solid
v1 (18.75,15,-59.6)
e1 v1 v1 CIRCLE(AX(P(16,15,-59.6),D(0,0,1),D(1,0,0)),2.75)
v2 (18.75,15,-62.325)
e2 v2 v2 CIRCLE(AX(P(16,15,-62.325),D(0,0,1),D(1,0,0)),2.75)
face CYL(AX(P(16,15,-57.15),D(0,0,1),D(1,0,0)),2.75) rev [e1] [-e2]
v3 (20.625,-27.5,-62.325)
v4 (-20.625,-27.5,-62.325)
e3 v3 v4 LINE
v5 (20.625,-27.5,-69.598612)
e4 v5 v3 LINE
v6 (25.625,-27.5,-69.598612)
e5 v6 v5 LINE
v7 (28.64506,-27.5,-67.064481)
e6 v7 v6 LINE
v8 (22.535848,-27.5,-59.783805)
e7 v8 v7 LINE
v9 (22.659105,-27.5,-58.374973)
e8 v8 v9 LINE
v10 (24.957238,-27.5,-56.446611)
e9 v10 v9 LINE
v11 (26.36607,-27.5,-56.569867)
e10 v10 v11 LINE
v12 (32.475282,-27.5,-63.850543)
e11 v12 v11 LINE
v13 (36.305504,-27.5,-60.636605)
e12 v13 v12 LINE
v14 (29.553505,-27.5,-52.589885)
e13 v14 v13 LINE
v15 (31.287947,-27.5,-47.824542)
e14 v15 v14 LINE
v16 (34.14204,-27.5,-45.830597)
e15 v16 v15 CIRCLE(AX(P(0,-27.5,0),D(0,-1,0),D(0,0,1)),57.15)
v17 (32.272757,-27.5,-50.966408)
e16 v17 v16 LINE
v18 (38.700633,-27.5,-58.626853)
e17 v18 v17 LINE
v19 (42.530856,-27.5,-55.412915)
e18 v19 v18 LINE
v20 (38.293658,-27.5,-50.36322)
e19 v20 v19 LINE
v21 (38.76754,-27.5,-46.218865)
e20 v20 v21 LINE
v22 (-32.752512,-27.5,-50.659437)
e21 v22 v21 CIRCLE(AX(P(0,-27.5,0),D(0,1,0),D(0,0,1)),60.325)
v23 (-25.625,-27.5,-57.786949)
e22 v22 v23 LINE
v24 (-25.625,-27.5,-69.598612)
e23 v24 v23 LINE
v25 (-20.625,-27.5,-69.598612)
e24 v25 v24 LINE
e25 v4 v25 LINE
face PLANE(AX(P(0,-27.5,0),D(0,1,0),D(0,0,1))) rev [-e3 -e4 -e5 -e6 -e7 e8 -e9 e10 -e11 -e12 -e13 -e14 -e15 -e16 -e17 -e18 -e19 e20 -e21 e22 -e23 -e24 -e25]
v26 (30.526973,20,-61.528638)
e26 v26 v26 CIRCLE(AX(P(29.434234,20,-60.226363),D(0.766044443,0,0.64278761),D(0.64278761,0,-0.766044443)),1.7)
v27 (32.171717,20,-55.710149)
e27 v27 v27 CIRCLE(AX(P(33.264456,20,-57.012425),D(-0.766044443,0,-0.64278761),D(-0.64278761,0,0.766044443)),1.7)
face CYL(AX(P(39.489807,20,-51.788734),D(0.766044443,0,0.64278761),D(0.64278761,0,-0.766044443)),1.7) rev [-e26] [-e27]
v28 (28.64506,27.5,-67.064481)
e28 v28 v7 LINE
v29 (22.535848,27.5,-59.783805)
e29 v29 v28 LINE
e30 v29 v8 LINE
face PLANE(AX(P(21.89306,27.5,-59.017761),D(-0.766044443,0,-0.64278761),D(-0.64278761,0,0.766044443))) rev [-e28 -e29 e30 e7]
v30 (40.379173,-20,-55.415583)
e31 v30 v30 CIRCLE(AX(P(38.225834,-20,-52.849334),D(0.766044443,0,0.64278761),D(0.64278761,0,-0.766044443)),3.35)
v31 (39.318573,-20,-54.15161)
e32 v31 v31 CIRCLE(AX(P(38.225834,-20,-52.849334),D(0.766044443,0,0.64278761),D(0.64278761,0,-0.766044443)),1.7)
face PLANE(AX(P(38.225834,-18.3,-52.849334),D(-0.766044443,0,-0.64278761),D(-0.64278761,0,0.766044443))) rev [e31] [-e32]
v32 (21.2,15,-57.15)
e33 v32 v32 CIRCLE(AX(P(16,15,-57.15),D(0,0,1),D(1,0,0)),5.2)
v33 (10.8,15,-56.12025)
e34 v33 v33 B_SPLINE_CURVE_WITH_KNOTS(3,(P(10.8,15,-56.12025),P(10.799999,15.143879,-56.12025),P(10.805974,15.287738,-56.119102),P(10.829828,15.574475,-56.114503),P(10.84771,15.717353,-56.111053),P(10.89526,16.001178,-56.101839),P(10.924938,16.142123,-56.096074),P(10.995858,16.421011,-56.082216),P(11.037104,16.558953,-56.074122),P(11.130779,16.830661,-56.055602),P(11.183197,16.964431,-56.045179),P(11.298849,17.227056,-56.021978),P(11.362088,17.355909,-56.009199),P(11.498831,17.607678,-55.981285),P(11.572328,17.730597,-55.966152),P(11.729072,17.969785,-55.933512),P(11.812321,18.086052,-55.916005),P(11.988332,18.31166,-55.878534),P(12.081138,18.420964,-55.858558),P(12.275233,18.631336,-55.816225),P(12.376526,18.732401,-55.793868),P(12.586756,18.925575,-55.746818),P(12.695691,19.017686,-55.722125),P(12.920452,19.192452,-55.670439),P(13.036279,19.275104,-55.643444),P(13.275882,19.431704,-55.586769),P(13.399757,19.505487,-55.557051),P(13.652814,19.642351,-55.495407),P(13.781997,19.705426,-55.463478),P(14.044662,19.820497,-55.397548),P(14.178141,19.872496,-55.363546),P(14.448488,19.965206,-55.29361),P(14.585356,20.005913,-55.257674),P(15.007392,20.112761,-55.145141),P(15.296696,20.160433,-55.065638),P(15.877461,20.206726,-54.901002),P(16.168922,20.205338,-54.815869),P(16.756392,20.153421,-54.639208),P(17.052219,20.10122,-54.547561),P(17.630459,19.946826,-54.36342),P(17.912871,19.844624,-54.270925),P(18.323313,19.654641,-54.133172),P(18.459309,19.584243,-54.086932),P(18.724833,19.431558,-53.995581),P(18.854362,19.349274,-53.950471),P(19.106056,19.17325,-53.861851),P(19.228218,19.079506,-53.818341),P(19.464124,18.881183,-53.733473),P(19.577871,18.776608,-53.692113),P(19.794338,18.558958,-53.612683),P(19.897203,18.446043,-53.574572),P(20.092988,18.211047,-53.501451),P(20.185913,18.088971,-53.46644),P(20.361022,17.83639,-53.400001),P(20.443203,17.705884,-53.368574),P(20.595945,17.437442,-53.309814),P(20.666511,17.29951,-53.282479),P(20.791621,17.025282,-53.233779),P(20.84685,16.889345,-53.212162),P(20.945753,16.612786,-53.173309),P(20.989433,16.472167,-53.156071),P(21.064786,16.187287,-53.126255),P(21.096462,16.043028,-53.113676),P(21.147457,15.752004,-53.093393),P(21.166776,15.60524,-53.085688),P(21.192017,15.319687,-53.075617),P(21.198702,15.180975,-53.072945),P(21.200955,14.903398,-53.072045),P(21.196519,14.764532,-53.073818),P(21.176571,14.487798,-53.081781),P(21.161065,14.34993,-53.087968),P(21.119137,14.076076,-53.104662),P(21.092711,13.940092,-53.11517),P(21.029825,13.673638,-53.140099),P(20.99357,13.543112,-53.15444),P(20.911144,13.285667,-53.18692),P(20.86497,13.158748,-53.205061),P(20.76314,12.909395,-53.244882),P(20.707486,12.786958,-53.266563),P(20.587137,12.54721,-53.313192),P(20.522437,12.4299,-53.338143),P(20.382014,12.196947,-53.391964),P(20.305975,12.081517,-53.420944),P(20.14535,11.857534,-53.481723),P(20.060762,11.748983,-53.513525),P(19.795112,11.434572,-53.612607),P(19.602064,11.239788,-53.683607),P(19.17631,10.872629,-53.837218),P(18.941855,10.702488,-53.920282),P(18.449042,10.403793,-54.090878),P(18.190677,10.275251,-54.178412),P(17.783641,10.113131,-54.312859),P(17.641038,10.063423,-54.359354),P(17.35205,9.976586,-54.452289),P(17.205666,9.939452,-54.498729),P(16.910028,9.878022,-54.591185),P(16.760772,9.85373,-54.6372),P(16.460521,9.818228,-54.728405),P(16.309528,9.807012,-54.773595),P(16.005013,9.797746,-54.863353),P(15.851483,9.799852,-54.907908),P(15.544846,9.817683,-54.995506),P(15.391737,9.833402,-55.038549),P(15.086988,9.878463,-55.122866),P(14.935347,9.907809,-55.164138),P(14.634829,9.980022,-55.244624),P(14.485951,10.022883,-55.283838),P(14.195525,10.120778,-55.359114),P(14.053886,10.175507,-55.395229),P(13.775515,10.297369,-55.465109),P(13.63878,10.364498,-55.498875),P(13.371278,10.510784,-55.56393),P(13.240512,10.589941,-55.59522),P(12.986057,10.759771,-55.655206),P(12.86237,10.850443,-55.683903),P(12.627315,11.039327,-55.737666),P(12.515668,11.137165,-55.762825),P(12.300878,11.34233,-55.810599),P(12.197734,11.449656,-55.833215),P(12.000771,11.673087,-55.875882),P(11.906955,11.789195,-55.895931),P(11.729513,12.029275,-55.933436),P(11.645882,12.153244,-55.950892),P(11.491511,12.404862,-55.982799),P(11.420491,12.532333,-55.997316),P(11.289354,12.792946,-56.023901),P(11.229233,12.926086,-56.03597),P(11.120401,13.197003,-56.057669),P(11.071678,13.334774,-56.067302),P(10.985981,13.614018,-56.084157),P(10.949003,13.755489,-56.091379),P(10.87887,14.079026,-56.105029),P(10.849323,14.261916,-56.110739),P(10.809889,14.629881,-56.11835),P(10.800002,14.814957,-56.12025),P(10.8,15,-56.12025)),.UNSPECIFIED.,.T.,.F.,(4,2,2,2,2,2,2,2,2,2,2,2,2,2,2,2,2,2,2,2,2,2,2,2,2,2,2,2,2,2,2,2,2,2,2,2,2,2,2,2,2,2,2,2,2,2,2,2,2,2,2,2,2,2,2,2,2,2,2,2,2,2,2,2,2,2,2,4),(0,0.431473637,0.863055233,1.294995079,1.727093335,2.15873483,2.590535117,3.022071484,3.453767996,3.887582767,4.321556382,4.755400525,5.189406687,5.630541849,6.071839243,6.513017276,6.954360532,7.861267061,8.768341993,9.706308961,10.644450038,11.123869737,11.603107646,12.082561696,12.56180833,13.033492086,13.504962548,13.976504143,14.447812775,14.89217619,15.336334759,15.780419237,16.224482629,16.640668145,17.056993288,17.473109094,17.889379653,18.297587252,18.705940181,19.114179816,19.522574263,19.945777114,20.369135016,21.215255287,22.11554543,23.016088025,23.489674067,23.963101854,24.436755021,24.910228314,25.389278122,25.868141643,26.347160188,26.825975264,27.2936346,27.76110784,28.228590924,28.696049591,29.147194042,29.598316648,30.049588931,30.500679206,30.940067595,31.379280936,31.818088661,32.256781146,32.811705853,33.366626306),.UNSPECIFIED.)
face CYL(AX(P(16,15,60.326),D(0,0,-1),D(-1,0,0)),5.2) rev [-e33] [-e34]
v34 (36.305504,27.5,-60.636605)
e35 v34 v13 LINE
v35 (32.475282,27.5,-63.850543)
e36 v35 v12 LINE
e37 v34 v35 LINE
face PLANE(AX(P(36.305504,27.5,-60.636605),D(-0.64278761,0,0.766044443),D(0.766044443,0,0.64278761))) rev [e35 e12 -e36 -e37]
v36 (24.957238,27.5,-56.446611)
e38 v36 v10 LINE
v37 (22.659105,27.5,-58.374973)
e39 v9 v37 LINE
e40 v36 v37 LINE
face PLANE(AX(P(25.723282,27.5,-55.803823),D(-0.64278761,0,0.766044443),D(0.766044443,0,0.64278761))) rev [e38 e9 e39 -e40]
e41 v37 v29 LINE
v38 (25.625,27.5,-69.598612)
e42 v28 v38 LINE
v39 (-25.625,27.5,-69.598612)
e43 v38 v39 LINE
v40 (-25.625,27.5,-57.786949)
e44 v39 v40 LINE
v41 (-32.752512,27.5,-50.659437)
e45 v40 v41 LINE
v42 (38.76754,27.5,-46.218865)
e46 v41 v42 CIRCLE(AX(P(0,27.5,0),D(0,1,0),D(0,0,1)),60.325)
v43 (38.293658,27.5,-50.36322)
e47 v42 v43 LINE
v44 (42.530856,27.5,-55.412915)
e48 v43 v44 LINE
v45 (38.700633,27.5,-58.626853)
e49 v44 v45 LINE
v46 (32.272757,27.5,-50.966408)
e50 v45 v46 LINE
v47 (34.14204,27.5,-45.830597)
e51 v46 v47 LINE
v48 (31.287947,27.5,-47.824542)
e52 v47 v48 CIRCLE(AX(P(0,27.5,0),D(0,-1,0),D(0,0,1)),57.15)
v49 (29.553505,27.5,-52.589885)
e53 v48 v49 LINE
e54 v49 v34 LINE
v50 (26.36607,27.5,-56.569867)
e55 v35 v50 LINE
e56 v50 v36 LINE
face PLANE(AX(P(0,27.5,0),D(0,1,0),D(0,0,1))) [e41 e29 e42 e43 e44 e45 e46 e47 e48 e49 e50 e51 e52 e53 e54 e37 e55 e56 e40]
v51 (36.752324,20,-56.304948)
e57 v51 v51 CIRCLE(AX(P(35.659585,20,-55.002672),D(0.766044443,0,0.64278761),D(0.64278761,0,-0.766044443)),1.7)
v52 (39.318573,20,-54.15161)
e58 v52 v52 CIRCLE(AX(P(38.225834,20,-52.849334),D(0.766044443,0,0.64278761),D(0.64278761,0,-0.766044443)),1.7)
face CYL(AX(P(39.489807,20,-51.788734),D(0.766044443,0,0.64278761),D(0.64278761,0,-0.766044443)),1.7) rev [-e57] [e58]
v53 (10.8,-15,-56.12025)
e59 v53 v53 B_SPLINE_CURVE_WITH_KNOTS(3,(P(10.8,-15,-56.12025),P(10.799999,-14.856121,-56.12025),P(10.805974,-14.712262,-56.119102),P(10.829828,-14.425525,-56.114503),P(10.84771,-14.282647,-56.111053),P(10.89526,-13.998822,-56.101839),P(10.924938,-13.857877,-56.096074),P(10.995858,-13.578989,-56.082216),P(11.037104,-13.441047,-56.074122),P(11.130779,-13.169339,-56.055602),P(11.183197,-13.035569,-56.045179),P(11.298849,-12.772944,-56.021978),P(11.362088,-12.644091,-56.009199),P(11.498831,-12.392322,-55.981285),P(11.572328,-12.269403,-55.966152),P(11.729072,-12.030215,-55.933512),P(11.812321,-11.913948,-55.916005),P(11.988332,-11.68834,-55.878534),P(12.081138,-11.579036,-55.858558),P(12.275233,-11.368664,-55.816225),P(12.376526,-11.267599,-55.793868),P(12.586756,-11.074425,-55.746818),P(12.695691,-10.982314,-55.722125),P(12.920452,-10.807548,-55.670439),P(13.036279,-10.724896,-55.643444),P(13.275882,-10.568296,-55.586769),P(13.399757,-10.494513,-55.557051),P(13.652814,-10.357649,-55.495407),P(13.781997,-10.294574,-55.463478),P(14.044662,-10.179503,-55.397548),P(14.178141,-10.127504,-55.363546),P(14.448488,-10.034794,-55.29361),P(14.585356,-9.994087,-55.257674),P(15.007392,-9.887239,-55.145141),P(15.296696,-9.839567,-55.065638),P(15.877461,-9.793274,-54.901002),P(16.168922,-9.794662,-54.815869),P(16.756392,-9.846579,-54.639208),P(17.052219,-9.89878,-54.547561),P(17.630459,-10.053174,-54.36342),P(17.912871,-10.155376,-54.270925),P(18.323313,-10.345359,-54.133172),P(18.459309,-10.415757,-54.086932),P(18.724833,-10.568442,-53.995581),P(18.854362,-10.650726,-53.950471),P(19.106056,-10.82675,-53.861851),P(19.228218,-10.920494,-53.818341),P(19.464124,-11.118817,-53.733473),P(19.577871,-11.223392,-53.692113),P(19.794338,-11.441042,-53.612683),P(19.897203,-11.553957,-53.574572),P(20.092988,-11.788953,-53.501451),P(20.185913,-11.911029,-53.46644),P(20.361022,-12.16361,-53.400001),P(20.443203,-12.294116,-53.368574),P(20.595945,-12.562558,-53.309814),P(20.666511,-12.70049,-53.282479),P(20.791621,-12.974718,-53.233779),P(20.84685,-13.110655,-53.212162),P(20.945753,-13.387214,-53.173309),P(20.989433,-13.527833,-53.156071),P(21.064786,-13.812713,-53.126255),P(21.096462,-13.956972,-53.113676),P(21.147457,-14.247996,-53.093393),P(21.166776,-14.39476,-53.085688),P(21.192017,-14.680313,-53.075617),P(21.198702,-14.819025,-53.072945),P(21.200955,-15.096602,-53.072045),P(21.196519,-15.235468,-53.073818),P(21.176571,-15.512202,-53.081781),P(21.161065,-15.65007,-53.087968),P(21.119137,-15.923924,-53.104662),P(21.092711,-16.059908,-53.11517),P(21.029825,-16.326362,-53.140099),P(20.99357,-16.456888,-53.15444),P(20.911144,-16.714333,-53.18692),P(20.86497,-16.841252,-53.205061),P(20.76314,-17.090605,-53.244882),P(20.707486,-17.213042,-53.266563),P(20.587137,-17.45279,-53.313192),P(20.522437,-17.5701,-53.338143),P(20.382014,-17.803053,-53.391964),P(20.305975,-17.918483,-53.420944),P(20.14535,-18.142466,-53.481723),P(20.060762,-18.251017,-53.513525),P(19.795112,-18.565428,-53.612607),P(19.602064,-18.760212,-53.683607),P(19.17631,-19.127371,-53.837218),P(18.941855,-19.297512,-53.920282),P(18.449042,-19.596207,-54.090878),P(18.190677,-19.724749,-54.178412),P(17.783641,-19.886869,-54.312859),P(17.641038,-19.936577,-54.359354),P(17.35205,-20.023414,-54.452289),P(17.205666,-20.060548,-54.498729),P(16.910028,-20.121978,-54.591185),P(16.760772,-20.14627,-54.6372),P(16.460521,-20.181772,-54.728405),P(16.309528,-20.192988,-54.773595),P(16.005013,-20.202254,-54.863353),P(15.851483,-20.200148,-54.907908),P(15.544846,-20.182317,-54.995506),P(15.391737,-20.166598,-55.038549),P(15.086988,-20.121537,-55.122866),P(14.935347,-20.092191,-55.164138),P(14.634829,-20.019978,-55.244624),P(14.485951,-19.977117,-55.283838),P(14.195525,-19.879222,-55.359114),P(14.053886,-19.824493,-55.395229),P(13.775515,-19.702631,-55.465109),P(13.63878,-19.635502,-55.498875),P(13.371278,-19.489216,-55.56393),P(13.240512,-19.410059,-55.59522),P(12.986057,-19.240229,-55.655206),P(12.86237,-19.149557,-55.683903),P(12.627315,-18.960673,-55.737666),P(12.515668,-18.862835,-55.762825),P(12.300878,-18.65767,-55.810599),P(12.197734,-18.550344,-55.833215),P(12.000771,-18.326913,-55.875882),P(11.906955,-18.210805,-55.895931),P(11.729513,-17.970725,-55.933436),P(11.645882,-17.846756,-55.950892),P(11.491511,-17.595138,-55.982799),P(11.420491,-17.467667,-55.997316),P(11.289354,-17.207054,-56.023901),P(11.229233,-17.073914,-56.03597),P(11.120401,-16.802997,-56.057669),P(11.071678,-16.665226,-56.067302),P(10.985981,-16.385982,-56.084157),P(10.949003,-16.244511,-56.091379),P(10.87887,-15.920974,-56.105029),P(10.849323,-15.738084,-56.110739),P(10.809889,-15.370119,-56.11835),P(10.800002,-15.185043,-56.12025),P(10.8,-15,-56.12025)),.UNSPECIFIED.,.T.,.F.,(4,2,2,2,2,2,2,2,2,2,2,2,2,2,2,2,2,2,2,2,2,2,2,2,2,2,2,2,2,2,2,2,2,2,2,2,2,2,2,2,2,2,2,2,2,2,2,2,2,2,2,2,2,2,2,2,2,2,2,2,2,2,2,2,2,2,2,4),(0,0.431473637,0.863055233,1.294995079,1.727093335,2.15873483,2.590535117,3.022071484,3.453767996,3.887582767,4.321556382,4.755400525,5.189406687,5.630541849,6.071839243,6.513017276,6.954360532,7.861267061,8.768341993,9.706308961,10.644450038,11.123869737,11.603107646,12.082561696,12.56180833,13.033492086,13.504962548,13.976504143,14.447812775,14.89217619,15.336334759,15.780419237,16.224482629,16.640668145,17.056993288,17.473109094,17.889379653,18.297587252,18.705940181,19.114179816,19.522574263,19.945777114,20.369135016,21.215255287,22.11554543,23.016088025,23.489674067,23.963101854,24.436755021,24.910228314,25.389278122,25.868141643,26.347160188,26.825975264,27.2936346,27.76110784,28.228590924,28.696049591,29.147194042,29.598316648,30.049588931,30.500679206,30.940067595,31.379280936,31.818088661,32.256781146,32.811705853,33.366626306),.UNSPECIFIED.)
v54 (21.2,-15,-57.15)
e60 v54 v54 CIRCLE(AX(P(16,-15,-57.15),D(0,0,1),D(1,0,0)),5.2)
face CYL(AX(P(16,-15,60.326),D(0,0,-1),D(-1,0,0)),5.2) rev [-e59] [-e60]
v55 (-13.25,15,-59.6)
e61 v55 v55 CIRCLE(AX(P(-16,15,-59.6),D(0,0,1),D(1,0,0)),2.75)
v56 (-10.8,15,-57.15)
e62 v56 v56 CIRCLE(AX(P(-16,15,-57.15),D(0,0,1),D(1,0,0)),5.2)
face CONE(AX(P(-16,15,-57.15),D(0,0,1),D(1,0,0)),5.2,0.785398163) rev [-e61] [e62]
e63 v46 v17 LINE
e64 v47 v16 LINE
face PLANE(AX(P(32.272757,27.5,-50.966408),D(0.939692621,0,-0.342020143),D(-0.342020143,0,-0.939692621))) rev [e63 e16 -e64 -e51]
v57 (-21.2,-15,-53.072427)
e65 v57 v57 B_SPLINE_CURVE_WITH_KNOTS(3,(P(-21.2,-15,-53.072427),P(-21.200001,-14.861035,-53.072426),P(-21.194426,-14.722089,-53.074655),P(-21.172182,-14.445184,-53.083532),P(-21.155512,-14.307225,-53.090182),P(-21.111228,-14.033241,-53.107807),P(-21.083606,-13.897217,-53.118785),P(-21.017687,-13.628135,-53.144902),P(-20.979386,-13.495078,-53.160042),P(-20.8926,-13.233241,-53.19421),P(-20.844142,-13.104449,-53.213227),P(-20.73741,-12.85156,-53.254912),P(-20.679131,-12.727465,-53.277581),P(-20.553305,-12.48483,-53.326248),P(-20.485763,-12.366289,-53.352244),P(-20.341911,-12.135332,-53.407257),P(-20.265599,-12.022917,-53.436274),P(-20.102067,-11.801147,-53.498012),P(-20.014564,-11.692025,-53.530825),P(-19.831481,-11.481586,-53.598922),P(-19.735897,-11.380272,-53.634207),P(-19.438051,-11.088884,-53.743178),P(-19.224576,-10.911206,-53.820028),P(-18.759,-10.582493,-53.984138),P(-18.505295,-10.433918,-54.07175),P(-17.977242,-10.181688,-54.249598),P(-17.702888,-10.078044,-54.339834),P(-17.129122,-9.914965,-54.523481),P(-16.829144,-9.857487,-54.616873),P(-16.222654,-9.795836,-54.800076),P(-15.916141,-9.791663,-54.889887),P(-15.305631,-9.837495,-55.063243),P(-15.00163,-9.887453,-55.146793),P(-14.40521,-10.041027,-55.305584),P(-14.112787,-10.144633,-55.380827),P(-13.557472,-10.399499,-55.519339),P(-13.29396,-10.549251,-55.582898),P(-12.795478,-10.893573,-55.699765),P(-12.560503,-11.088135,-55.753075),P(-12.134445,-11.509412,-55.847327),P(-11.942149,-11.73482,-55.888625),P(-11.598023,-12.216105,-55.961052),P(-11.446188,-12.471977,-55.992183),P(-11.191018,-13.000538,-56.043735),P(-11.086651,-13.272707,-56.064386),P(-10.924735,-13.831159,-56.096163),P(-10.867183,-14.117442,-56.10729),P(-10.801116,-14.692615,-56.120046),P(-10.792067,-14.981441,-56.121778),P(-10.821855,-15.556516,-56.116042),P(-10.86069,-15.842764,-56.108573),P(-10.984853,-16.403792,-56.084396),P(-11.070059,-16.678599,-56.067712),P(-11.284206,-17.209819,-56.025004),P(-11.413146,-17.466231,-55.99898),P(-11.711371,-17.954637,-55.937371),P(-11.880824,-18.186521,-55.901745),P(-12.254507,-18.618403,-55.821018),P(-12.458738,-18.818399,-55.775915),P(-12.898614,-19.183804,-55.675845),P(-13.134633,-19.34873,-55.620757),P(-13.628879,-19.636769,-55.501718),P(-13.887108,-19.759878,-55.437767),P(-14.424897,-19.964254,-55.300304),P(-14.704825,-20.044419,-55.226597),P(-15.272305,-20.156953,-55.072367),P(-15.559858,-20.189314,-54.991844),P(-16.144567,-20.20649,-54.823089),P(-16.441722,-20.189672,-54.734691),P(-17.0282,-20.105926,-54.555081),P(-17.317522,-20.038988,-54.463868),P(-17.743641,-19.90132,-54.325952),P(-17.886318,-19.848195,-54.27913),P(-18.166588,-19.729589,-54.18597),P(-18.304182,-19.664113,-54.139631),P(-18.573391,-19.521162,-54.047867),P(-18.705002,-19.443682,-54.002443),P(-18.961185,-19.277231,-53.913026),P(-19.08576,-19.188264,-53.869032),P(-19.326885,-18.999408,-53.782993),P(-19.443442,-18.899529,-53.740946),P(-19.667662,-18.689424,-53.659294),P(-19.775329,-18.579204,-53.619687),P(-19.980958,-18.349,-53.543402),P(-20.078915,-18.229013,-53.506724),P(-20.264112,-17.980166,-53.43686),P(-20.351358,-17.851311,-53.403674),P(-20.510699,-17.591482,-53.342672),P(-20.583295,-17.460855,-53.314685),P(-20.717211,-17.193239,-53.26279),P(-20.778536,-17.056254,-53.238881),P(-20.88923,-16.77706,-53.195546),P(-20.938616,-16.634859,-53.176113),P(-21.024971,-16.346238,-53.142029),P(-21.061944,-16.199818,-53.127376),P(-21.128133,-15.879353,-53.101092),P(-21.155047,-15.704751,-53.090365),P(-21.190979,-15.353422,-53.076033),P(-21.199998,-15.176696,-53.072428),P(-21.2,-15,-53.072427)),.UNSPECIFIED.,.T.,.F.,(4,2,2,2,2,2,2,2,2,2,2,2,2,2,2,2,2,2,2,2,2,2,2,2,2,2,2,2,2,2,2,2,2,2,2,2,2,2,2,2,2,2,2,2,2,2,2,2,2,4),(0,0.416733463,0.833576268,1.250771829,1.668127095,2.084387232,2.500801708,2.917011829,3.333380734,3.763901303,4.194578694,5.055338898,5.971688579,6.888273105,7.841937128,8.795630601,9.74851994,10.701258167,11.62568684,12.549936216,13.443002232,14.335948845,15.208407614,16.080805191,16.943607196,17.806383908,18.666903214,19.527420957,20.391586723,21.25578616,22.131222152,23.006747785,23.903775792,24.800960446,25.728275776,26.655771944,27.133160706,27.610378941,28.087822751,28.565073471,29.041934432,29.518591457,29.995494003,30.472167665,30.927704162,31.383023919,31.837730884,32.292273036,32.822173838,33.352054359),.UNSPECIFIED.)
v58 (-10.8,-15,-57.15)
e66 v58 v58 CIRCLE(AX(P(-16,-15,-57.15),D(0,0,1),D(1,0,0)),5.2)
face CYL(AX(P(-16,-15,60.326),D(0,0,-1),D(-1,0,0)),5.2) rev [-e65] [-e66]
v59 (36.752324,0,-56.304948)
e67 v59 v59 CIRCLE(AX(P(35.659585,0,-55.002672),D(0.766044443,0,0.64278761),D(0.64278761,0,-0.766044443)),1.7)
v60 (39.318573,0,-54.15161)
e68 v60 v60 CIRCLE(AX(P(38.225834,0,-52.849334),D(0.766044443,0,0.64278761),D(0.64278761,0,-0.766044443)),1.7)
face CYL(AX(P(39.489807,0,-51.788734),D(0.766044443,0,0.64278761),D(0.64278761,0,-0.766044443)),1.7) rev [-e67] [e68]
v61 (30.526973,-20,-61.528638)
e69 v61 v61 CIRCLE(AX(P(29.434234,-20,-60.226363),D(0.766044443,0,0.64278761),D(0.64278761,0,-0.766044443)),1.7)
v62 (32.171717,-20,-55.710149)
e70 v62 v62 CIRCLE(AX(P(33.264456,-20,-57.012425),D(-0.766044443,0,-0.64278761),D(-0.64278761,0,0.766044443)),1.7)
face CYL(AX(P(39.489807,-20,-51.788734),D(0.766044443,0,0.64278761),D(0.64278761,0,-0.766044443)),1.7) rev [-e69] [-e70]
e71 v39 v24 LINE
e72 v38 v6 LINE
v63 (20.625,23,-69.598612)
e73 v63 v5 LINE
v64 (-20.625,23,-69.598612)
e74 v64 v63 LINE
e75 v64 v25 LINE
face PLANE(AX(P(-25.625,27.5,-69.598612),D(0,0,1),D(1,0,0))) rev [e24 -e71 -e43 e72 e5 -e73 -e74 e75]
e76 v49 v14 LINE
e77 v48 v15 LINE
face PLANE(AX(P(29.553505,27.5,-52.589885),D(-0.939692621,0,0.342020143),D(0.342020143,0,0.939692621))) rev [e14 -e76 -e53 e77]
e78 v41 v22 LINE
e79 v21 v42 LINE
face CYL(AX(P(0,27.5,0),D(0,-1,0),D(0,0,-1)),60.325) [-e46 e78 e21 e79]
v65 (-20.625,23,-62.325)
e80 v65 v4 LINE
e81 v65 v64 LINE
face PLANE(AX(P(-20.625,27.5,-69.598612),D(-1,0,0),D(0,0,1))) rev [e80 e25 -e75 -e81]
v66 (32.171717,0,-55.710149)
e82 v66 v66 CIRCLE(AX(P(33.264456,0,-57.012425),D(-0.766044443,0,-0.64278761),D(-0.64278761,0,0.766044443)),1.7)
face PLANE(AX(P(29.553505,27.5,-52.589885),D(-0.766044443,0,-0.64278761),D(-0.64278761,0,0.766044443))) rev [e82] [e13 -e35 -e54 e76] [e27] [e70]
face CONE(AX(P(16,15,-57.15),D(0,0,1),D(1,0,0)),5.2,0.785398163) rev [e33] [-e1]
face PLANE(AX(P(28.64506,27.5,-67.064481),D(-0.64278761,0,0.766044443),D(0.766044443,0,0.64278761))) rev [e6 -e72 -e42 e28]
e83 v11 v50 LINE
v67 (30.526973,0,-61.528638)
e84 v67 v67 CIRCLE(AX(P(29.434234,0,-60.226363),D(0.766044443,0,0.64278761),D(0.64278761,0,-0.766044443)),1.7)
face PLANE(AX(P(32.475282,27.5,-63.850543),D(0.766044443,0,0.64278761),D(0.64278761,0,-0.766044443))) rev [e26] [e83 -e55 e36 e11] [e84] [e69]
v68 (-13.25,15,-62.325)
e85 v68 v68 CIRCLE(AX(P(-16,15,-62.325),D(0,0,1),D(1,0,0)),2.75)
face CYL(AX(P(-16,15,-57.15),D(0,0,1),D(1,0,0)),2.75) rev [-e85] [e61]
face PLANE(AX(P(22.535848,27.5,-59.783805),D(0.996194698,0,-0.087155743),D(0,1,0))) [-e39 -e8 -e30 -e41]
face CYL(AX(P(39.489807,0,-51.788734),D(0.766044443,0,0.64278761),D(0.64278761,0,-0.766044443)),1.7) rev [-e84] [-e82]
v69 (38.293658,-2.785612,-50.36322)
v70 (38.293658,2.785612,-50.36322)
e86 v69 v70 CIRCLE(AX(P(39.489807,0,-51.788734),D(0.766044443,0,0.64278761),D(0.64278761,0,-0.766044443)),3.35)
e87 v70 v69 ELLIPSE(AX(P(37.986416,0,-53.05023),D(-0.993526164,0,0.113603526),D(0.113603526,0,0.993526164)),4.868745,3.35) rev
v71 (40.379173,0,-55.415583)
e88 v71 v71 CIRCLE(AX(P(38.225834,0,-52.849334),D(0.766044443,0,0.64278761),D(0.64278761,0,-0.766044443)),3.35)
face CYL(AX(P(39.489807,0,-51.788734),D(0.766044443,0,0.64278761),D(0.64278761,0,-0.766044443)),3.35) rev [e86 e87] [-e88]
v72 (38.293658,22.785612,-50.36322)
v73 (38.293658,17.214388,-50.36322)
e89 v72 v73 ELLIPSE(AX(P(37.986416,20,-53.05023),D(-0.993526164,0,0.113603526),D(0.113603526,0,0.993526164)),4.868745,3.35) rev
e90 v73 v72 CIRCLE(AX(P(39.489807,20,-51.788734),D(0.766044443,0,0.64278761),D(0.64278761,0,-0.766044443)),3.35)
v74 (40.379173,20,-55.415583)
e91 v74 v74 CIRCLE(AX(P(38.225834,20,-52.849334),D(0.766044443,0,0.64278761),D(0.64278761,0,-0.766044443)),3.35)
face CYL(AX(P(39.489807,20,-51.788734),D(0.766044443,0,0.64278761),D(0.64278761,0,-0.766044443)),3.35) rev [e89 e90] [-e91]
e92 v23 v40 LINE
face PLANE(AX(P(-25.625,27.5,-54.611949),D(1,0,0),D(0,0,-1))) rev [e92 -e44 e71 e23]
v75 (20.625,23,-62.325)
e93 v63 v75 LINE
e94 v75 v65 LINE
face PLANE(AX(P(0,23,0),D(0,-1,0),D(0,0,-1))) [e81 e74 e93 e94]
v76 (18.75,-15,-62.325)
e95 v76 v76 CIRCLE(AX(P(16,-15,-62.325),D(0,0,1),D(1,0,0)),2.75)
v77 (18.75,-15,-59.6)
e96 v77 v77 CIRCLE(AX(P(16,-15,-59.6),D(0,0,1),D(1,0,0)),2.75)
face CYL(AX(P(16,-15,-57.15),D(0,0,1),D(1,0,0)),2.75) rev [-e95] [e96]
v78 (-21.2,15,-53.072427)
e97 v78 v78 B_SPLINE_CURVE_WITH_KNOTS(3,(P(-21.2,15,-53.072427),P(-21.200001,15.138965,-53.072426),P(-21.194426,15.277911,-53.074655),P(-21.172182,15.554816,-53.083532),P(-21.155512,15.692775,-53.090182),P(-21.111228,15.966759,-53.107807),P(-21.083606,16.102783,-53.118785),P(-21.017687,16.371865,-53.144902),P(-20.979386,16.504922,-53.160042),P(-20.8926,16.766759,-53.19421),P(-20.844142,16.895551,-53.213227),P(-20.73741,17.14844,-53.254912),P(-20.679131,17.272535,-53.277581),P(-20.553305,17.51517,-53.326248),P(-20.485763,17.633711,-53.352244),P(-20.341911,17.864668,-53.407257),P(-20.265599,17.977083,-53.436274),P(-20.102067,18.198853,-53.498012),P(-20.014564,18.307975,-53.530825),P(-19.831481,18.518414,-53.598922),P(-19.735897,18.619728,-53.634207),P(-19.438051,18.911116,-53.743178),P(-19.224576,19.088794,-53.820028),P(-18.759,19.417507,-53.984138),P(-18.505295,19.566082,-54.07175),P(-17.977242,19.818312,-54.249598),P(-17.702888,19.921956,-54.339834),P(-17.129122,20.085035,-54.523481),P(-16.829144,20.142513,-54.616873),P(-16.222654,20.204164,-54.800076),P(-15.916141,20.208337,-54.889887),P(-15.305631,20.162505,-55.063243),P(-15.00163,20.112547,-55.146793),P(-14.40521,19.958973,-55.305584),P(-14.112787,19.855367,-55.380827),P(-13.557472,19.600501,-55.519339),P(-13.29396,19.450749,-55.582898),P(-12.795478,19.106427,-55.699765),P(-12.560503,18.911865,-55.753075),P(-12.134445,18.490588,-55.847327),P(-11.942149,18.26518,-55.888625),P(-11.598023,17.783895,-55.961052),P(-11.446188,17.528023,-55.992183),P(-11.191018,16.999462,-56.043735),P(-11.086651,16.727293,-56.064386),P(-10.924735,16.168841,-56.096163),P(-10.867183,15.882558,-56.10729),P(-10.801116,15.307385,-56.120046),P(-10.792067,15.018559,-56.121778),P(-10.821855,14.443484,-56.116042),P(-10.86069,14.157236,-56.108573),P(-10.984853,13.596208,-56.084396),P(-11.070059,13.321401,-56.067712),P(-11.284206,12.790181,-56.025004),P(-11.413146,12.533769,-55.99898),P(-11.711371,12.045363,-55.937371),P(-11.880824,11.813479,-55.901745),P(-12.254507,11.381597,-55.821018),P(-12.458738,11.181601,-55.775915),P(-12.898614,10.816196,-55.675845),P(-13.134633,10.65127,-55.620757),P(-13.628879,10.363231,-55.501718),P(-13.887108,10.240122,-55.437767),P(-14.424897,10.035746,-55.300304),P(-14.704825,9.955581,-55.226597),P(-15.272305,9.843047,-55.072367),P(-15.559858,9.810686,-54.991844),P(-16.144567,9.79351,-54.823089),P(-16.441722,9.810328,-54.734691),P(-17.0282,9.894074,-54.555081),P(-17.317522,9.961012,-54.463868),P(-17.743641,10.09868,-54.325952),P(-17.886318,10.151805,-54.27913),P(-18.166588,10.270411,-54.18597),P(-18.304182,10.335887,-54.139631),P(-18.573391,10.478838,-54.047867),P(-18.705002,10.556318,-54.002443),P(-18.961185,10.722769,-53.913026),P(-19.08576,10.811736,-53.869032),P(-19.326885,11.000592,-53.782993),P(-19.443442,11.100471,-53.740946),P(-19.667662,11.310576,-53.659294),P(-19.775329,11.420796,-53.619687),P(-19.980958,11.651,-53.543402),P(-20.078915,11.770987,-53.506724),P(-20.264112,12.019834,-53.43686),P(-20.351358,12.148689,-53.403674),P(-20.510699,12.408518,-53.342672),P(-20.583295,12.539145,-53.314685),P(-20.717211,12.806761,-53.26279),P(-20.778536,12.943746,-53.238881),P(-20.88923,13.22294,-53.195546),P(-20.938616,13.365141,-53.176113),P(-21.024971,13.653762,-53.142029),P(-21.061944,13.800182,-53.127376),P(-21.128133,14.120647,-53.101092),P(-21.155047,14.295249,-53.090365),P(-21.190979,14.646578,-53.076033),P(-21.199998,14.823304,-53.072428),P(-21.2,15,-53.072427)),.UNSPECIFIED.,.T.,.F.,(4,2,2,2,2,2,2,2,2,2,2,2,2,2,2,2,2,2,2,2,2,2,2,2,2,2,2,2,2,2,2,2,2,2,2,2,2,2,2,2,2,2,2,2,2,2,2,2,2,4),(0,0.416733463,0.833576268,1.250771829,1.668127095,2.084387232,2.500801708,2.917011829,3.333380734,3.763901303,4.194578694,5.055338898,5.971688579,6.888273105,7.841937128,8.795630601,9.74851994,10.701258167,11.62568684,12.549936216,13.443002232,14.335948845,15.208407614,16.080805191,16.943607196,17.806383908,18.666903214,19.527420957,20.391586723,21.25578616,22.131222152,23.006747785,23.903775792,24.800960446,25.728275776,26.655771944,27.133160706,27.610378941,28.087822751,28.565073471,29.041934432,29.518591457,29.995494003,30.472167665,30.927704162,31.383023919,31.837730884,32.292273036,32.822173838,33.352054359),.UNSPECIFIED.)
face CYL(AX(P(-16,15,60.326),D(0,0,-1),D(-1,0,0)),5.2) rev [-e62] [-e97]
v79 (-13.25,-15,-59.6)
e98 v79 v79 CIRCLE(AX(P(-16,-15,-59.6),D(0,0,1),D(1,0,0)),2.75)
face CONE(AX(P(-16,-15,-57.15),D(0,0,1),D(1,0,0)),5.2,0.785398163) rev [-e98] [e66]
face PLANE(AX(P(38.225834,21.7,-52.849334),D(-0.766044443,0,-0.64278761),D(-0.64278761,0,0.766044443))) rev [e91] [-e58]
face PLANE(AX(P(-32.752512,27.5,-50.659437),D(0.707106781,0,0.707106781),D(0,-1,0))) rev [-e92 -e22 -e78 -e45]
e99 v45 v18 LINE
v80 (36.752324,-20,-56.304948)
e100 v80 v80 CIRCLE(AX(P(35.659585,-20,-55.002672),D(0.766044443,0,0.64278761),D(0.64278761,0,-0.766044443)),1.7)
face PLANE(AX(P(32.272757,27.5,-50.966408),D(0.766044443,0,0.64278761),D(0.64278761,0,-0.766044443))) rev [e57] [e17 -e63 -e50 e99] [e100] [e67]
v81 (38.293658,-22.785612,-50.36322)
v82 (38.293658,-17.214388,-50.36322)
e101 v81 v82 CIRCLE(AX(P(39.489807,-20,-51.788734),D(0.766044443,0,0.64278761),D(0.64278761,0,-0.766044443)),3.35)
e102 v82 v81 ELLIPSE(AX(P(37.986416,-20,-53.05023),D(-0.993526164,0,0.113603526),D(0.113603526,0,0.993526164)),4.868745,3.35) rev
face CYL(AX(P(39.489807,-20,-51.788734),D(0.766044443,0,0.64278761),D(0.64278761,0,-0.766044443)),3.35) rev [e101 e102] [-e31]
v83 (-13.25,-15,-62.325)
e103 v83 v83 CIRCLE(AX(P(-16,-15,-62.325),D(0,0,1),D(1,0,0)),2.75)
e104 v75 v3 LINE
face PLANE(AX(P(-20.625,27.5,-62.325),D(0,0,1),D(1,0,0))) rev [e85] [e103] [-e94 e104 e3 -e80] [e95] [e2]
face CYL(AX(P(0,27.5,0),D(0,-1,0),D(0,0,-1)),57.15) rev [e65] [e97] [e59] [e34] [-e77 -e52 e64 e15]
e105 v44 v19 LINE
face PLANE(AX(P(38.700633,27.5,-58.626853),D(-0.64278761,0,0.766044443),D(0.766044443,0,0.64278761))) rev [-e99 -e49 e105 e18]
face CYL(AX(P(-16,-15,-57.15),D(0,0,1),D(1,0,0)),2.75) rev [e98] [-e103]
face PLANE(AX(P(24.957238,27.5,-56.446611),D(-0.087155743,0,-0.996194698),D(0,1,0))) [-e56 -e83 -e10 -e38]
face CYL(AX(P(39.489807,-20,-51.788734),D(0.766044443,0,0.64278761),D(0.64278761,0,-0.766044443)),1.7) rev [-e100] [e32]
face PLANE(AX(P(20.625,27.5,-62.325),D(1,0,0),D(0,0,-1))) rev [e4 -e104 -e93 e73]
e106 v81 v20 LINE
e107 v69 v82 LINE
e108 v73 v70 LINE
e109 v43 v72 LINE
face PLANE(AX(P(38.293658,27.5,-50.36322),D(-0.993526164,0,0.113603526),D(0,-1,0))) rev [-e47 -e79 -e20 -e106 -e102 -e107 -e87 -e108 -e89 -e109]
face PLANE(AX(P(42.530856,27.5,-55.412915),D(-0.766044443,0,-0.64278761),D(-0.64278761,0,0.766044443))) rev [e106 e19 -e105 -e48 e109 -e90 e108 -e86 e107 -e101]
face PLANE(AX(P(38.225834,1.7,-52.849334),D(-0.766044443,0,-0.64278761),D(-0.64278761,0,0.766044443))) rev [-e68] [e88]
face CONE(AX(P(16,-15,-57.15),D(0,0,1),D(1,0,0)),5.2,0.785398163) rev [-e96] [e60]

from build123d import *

# Parameters (mm, degrees)
BOSS_EXTRUDE1_DEPTH                            = 27.5
CBORE_FOR_M3_SBHCS1_D                          = 3.4
CBORE_FOR_M3_SBHCS1_DEPTH                      = 14.9999954
CBORE_FOR_M3_SBHCS1_CBORE_D                    = 6.7
CBORE_FOR_M3_SBHCS1_CBORE_DEPTH                = 1.65
CBORE_FOR_M3_SBHCS1_TIP                        = 1.021463052
SKETCH4_W                                      = 41.25
SKETCH4_H                                      = 7.273611758
BOSS_EXTRUDE2_DEPTH                            = 4.5
CSK_FOR_M5_FLAT_HEAD_MACHINE_SCREW1_AT_2_COUNT = 2
CSK_FOR_M5_FLAT_HEAD_MACHINE_SCREW1_AT_2_PITCH = 32
CSK_FOR_M5_FLAT_HEAD_MACHINE_SCREW1_AT_3_COUNT = 2
CSK_FOR_M5_FLAT_HEAD_MACHINE_SCREW1_AT_3_PITCH = 43.863424399
CSK_FOR_M5_FLAT_HEAD_MACHINE_SCREW1_AT_4_COUNT = 2
CSK_FOR_M5_FLAT_HEAD_MACHINE_SCREW1_AT_4_PITCH = 30
CUT_EXTRUDE1_REACH                             = 136.892
CUT_EXTRUDE1_END_RADIUS                        = 57.15
SKETCH13_R                                     = 5.2
CHAMFER1_START                                 = -27.5
CHAMFER1_DEPTH                                 = 55
CHAMFER1_START_2                               = -3.038209282
CHAMFER1_2_OUTLINE_R                           = 3.35
CHAMFER1_2_DEPTH                               = 1.570474688
CHAMFER2_SIZE                                  = 1


with BuildPart() as part:
    # Sketch1 → Boss-Extrude1 (new, symmetric)
    with BuildSketch(Plane(origin=(0, 0, 0), x_dir=(1, 0, 0), z_dir=(0, 1, 0))):
        with BuildLine():
            Line((-25.625, 54.611949242), (-25.625, 69.598611758))
            Line((-25.625, 69.598611758), (-20.625, 69.598611758))
            Line((-20.625, 69.598611758), (-20.625, 62.325))
            Line((-20.625, 62.325), (20.625, 62.325))
            Line((20.625, 62.325), (20.625, 69.598611758))
            Line((20.625, 69.598611758), (25.625, 69.598611758))
            Line((25.625, 69.598611758), (28.64505971, 67.064480768))
            Line((28.64505971, 67.064480768), (21.893060118, 59.017760997))
            Line((21.893060118, 59.017760997), (25.723282334, 55.803822949))
            Line((25.723282334, 55.803822949), (32.475281926, 63.85054272))
            Line((32.475281926, 63.85054272), (36.305504142, 60.636604672))
            Line((36.305504142, 60.636604672), (29.553504549, 52.5898849))
            Line((29.553504549, 52.5898849), (31.287947409, 47.824542307))
            ThreePointArc((31.287947409, 47.824542307), (-32.73018113, -46.849308887), (34.142039673, 45.830597061))
            Line((34.142039673, 45.830597061), (32.272757303, 50.966408163))
            Line((32.272757303, 50.966408163), (38.7006334, 58.626852595))
            Line((38.7006334, 58.626852595), (42.530855615, 55.412914546))
            Line((42.530855615, 55.412914546), (36.399549462, 48.10590841))
            ThreePointArc((36.399549462, 48.10590841), (-6.293240092, -59.995839474), (-25.625, 54.611949242))
        make_face()
    extrude(amount=BOSS_EXTRUDE1_DEPTH, both=True)

    # CBORE for M3 SBHCS1
    with Locations(Plane(origin=(-2.327403337, 0, -1.952923282), x_dir=(0.6427876096865344, 0, -0.7660444431189822), z_dir=(0.7660444431189822, 0, 0.6427876096865344))):
        with Locations((65.056031142, 20), (65.056031142, 0), (65.056031142, -20)):
            CounterBoreHole(CBORE_FOR_M3_SBHCS1_D / 2, CBORE_FOR_M3_SBHCS1_CBORE_D / 2, CBORE_FOR_M3_SBHCS1_CBORE_DEPTH, depth=CBORE_FOR_M3_SBHCS1_DEPTH)
            with Locations((0, 0, -(CBORE_FOR_M3_SBHCS1_DEPTH + CBORE_FOR_M3_SBHCS1_TIP / 2))):  # 118° drill point
                Cone(0, CBORE_FOR_M3_SBHCS1_D / 2, CBORE_FOR_M3_SBHCS1_TIP, mode=Mode.SUBTRACT)

    # Sketch4 → Boss-Extrude2 (add)
    with BuildSketch(Plane.XZ.offset(-27.5)):
        with Locations((0, -65.961805879)):
            Rectangle(SKETCH4_W, SKETCH4_H)
    extrude(amount=BOSS_EXTRUDE2_DEPTH)

    # Sketch12 → CSK for M5 Flat Head Machine Screw1 (revolve, cut)
    with BuildSketch(Plane(origin=(-16, 15, -57.15), x_dir=(0, -1, 0), z_dir=(1, 0, 0))):
        Polygon((0, 0), (0, 12.448611758), (2.75, 12.448611758), (2.75, 2.45), (5.2, 0), align=None)
    csk_for_m5_flat_head_machine_screw1 = revolve(axis=Axis((-16, 15, -50.8), (0, 0, -1)), mode=Mode.SUBTRACT)

    # CSK for M5 Flat Head Machine Screw1 at 2: CSK for M5 Flat Head Machine Screw1 ×2
    with Locations(*[(i * CSK_FOR_M5_FLAT_HEAD_MACHINE_SCREW1_AT_2_PITCH, 0, 0) for i in range(1, CSK_FOR_M5_FLAT_HEAD_MACHINE_SCREW1_AT_2_COUNT)]):
        add(csk_for_m5_flat_head_machine_screw1, mode=Mode.SUBTRACT)

    # CSK for M5 Flat Head Machine Screw1 at 3: CSK for M5 Flat Head Machine Screw1 ×2
    with Locations(*[Vector(0.7295372041400852, -0.6839411288813297, 0) * (i * CSK_FOR_M5_FLAT_HEAD_MACHINE_SCREW1_AT_3_PITCH) for i in range(1, CSK_FOR_M5_FLAT_HEAD_MACHINE_SCREW1_AT_3_COUNT)]):
        add(csk_for_m5_flat_head_machine_screw1, mode=Mode.SUBTRACT)

    # CSK for M5 Flat Head Machine Screw1 at 4: CSK for M5 Flat Head Machine Screw1 ×2
    with Locations(*[(0, -i * CSK_FOR_M5_FLAT_HEAD_MACHINE_SCREW1_AT_4_PITCH, 0) for i in range(1, CSK_FOR_M5_FLAT_HEAD_MACHINE_SCREW1_AT_4_COUNT)]):
        add(csk_for_m5_flat_head_machine_screw1, mode=Mode.SUBTRACT)

    # Cut-Extrude1: up to this cylinder (the profile starts outside it)
    cut_extrude1_end = Plane(origin=(0, 0, 0), z_dir=(0, -1, 0)) * Cylinder(CUT_EXTRUDE1_END_RADIUS, 419.084, mode=Mode.PRIVATE)
    # Sketch13 → Cut-Extrude1 (cut, up to the surface)
    with BuildSketch(Plane.XY.offset(-57.15), mode=Mode.PRIVATE) as cut_extrude1_sk1:
        with Locations(Location((-16, -15, 0), (0, 0, 180))):
            Circle(SKETCH13_R)
    cut_extrude1_tool1 = extrude(cut_extrude1_sk1.sketch, amount=CUT_EXTRUDE1_REACH, mode=Mode.PRIVATE) - cut_extrude1_end
    add(cut_extrude1_tool1.solids().sort_by_distance((-16, -15, -57.15))[0], mode=Mode.SUBTRACT)
    # Sketch13 → Cut-Extrude1 (cut, up to the surface)
    with BuildSketch(Plane.XY.offset(-57.15), mode=Mode.PRIVATE) as cut_extrude1_sk2:
        with Locations(Location((16, -15, 0), (0, 0, 180))):
            Circle(SKETCH13_R)
    cut_extrude1_tool2 = extrude(cut_extrude1_sk2.sketch, amount=CUT_EXTRUDE1_REACH, mode=Mode.PRIVATE) - cut_extrude1_end
    add(cut_extrude1_tool2.solids().sort_by_distance((16, -15, -57.15))[0], mode=Mode.SUBTRACT)
    # Sketch13 → Cut-Extrude1 (cut, up to the surface)
    with BuildSketch(Plane.XY.offset(-57.15), mode=Mode.PRIVATE) as cut_extrude1_sk3:
        with Locations(Location((16, 15, 0), (0, 0, 180))):
            Circle(SKETCH13_R)
    cut_extrude1_tool3 = extrude(cut_extrude1_sk3.sketch, amount=CUT_EXTRUDE1_REACH, mode=Mode.PRIVATE) - cut_extrude1_end
    add(cut_extrude1_tool3.solids().sort_by_distance((16, 15, -57.15))[0], mode=Mode.SUBTRACT)
    # Sketch13 → Cut-Extrude1 (cut, up to the surface)
    with BuildSketch(Plane.XY.offset(-57.15), mode=Mode.PRIVATE) as cut_extrude1_sk4:
        with Locations(Location((-16, 15, 0), (0, 0, 180))):
            Circle(SKETCH13_R)
    cut_extrude1_tool4 = extrude(cut_extrude1_sk4.sketch, amount=CUT_EXTRUDE1_REACH, mode=Mode.PRIVATE) - cut_extrude1_end
    add(cut_extrude1_tool4.solids().sort_by_distance((-16, 15, -57.15))[0], mode=Mode.SUBTRACT)

    # Chamfer1: read off the stored shape, not the designer's step
    # Chamfer1 outline → Chamfer1 (add)
    with BuildSketch(Plane(origin=(0, 0, 0), x_dir=(1, 0, 0), z_dir=(0, 1, 0)).offset(CHAMFER1_START)):
        with BuildLine():
            ThreePointArc((36.399549462, 48.10590841), (37.595386052, 47.177246344), (38.767539596, 46.218865181))
            Line((38.767539596, 46.218865181), (38.293658487, 50.363219646))
            Line((38.293658487, 50.363219646), (36.399549462, 48.10590841))
        make_face()
        with BuildLine():
            Line((-25.625, 57.786949242), (-32.752511971, 50.659437271))
            ThreePointArc((-32.752511971, 50.659437271), (-29.255581753, 52.756199269), (-25.625, 54.611949242))
            Line((-25.625, 54.611949242), (-25.625, 57.786949242))
        make_face()
    extrude(amount=CHAMFER1_DEPTH)

    # Chamfer1 2 outline → Chamfer1 2 (cut)
    with BuildSketch(Plane(origin=(0, 0, 0), x_dir=(0.642787609686534, 0, -0.7660444431189825), z_dir=(0.7660444431189823, 0, 0.6427876096865344)).offset(CHAMFER1_START_2)):
        with Locations((65.056031142, -20)):
            Circle(CHAMFER1_2_OUTLINE_R)
        with Locations((65.056031142, 0)):
            Circle(CHAMFER1_2_OUTLINE_R)
        with Locations((65.056031142, 20)):
            Circle(CHAMFER1_2_OUTLINE_R)
    extrude(amount=CHAMFER1_2_DEPTH, mode=Mode.SUBTRACT)

    # Chamfer2
    chamfer2_edges = [part.edges().sort_by_distance(p)[0] for p in [
        (21.893060118, 0, -59.017760997),
        (25.723282334, 0, -55.803822949),
    ]]
    chamfer(chamfer2_edges, length=CHAMFER2_SIZE)


solid = part.part
